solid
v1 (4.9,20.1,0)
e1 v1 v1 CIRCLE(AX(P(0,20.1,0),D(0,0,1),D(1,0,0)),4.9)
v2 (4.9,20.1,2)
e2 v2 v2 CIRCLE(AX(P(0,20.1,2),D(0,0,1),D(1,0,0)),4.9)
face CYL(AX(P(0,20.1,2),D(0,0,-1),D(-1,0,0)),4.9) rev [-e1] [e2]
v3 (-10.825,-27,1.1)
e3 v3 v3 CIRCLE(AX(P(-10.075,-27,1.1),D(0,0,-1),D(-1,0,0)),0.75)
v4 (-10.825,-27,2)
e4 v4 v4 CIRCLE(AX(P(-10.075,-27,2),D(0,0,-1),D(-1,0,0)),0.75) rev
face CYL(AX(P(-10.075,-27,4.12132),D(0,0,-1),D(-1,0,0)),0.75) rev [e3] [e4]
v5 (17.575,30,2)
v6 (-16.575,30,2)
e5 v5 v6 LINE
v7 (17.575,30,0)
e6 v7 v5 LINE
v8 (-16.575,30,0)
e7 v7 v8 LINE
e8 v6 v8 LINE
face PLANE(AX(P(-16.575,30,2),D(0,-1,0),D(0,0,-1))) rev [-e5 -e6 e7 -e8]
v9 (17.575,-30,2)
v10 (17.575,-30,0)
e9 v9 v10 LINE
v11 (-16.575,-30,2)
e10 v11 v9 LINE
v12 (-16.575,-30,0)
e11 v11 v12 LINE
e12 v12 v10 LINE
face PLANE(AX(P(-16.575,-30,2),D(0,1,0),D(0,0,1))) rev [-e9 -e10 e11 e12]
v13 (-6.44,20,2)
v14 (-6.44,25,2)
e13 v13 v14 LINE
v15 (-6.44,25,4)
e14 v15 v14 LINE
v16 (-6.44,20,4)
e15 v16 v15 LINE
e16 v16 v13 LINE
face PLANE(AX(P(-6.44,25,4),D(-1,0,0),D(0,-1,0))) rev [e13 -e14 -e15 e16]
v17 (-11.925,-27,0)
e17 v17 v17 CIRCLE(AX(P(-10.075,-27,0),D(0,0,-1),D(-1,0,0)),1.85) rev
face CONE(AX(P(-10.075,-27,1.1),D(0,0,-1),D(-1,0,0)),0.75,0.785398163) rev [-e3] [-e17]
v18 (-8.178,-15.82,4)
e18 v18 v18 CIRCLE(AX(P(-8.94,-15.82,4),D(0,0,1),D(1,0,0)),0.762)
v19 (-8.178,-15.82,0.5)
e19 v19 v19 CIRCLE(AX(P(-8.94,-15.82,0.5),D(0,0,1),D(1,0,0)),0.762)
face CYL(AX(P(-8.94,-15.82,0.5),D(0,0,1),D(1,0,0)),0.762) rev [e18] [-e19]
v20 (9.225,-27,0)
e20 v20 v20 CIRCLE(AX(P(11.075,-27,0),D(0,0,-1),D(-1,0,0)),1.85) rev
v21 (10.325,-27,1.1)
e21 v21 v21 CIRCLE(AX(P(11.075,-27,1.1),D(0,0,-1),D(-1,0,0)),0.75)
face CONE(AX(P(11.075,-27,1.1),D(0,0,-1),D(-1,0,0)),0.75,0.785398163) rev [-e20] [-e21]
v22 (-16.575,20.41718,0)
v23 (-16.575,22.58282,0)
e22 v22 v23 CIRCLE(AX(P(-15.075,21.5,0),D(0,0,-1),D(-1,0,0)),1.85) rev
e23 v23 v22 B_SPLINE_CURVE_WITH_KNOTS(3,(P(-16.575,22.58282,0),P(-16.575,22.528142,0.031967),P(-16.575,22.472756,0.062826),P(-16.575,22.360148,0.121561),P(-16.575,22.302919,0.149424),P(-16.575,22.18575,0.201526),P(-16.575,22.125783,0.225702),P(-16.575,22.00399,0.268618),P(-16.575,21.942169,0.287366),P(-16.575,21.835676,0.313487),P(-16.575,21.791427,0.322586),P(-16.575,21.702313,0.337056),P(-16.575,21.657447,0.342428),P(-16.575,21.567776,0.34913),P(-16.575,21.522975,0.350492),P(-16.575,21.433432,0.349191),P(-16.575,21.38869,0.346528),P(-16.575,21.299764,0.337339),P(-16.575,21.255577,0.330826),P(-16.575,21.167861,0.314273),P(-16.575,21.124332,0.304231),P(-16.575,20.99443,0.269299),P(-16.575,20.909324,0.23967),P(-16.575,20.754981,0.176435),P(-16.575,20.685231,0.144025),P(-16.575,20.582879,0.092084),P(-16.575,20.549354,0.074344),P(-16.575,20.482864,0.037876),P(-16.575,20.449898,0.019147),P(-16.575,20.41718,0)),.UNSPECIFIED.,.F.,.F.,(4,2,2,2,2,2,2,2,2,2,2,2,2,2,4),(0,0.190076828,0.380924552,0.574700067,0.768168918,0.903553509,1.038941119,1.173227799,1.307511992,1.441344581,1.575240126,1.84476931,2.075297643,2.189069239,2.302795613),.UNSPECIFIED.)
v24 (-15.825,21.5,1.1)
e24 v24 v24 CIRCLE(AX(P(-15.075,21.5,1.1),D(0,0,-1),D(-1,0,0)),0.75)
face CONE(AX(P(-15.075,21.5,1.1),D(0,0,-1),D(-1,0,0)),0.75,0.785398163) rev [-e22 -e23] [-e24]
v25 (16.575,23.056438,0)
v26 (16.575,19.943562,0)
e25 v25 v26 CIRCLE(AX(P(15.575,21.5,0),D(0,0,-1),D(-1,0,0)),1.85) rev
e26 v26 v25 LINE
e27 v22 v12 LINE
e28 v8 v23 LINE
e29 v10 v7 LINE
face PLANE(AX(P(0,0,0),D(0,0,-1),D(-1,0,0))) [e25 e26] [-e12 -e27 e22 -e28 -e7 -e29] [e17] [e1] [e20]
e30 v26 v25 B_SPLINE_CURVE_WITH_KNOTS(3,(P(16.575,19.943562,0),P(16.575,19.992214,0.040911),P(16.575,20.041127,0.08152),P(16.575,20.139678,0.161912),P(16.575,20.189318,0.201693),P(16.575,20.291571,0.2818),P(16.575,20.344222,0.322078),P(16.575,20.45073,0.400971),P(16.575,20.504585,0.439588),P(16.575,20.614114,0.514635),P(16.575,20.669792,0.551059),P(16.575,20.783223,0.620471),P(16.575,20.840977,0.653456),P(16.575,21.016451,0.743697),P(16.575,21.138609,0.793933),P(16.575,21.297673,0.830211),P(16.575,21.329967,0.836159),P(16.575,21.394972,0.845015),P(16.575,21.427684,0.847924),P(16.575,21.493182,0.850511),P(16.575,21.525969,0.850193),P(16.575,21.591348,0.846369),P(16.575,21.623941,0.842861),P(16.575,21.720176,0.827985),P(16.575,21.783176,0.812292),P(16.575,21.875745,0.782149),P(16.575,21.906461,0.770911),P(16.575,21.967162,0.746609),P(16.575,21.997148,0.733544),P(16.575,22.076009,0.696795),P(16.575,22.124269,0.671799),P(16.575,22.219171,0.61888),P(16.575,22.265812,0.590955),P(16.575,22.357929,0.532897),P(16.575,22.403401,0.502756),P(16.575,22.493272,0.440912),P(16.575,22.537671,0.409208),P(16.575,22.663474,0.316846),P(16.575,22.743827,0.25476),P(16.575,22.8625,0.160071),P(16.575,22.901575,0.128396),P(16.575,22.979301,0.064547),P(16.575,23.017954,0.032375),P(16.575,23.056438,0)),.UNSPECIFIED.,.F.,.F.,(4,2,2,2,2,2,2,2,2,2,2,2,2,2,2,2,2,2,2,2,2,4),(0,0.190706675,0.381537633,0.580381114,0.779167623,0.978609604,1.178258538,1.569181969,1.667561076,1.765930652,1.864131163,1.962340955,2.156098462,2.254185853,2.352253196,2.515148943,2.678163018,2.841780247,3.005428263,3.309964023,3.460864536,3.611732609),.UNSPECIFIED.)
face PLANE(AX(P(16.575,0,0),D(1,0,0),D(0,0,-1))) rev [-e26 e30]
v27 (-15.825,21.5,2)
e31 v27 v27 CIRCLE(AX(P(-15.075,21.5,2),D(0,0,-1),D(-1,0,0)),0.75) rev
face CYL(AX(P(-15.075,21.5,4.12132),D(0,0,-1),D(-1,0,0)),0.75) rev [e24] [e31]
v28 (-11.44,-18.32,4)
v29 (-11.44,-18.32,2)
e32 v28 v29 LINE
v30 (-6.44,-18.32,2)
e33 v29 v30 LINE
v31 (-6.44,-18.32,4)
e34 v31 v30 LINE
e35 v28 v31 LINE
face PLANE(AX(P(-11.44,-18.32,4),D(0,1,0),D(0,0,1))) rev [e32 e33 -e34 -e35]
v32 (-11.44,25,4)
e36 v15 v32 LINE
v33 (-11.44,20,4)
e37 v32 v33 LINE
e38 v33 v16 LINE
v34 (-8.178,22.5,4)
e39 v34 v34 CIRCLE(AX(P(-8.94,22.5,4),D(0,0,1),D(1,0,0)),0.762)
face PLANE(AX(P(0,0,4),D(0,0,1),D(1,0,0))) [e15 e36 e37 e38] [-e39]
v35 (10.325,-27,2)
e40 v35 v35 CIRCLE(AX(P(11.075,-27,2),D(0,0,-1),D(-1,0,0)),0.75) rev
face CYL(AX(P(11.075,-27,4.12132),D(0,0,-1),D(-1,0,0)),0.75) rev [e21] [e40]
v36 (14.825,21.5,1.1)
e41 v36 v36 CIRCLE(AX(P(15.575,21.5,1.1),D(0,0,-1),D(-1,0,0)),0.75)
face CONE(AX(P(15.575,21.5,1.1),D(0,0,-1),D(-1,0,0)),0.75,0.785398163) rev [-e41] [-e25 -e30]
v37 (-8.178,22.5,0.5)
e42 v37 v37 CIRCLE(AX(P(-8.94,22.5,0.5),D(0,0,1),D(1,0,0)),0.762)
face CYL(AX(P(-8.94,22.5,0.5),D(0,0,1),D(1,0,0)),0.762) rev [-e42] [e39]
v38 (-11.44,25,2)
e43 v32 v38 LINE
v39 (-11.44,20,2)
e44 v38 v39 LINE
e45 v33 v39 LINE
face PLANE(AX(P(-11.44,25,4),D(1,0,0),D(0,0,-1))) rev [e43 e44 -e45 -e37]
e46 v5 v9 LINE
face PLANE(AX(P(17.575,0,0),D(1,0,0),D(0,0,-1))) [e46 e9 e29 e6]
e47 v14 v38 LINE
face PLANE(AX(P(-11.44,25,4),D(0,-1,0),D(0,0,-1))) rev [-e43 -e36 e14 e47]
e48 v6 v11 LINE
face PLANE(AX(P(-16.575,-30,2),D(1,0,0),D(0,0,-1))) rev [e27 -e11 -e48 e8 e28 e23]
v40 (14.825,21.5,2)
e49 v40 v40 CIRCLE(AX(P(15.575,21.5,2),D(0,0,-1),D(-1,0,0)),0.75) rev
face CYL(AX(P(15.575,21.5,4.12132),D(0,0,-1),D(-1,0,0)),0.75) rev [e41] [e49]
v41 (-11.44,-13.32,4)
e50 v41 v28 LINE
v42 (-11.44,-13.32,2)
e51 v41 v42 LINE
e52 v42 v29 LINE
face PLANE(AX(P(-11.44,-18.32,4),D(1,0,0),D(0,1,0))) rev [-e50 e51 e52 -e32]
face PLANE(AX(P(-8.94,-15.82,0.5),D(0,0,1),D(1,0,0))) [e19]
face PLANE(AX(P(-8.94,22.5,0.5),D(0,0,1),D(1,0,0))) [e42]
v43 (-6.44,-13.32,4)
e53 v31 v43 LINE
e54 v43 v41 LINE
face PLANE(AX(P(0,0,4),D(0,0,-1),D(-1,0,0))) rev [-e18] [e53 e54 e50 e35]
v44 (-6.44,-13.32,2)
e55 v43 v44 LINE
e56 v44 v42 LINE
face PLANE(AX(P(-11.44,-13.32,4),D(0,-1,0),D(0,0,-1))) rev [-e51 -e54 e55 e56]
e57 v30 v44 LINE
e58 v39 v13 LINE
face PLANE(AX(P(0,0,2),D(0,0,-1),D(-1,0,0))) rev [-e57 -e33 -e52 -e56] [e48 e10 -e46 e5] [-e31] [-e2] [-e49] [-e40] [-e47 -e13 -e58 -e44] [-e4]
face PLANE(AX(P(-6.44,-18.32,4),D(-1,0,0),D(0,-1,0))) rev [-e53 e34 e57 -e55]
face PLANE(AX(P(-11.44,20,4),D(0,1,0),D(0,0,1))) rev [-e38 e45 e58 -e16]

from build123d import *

# Parameters (mm, degrees)
SKETCH1_W           = 33.15
SKETCH1_H           = 60
SKETCH1_R           = 4.9
BOSS_EXTRUDE1_DEPTH = 2
SKETCH3_W           = 5
SKETCH3_H           = 5
BOSS_EXTRUDE2_DEPTH = 2
SKETCH4_R           = 0.75
CUT_EXTRUDE1_DEPTH  = 2
CHAMFER1_SIZE       = 1.1
SKETCH5_W           = 2
SKETCH5_H           = 60
BOSS_EXTRUDE3_DEPTH = 1
SKETCH7_R           = 0.762
CUT_EXTRUDE2_DEPTH  = 3.5


with BuildPart() as part:
    # Sketch1 → Boss-Extrude1 (new body)
    with BuildSketch(Plane.XY):
        Rectangle(SKETCH1_W, SKETCH1_H)
        with Locations((0, 20.1)):
            Circle(SKETCH1_R, mode=Mode.SUBTRACT)
    extrude(amount=BOSS_EXTRUDE1_DEPTH)

    # Sketch3 → Boss-Extrude2 (add)
    with BuildSketch(Plane.XY.offset(2)):
        with Locations((-8.94, 22.5)):
            Rectangle(SKETCH3_W, SKETCH3_H)
        with Locations((-8.94, -15.82)):
            Rectangle(SKETCH3_W, SKETCH3_H)
    extrude(amount=BOSS_EXTRUDE2_DEPTH)

    # Sketch4 → Cut-Extrude1 (cut)
    with BuildSketch(Plane(origin=(0, 0, 0), x_dir=(-1, 0, 0), z_dir=(0, 0, -1))):
        with Locations((-15.575, 21.5)):
            Circle(SKETCH4_R)
        with Locations((15.075, 21.5)):
            Circle(SKETCH4_R)
        with Locations((10.075, -27)):
            Circle(SKETCH4_R)
        with Locations((-11.075, -27)):
            Circle(SKETCH4_R)
    extrude(amount=-CUT_EXTRUDE1_DEPTH, mode=Mode.SUBTRACT)

    # Chamfer1
    # the kernel refuses this chamfer: 1.1 mm, written as the material it takes off along each edge
    with BuildSketch(Plane(origin=(15.575, 21.5, 0), x_dir=(-1, 0, 0), z_dir=(0, -1, 0))) as chamfer1_piece_1:
        Polygon((0.75 + CHAMFER1_SIZE, 0), (0.75, -CHAMFER1_SIZE), (0.75, 0), align=None)
    revolve(axis=Axis((15.575, 21.5, 0), (0, 0, -1)), mode=Mode.SUBTRACT)
    with BuildSketch(Plane(origin=(-15.075, 21.5, 0), x_dir=(-1, 0, 0), z_dir=(0, -1, 0))) as chamfer1_piece_2:
        Polygon((0.75 + CHAMFER1_SIZE, 0), (0.75, -CHAMFER1_SIZE), (0.75, 0), align=None)
    revolve(axis=Axis((-15.075, 21.5, 0), (0, 0, -1)), mode=Mode.SUBTRACT)
    with BuildSketch(Plane(origin=(-10.075, -27, 0), x_dir=(-1, 0, 0), z_dir=(0, -1, 0))) as chamfer1_piece_3:
        Polygon((0.75 + CHAMFER1_SIZE, 0), (0.75, -CHAMFER1_SIZE), (0.75, 0), align=None)
    revolve(axis=Axis((-10.075, -27, 0), (0, 0, -1)), mode=Mode.SUBTRACT)
    with BuildSketch(Plane(origin=(11.075, -27, 0), x_dir=(-1, 0, 0), z_dir=(0, -1, 0))) as chamfer1_piece_4:
        Polygon((0.75 + CHAMFER1_SIZE, 0), (0.75, -CHAMFER1_SIZE), (0.75, 0), align=None)
    revolve(axis=Axis((11.075, -27, 0), (0, 0, -1)), mode=Mode.SUBTRACT)

    # Sketch5 → Boss-Extrude3 (add)
    with BuildSketch(Plane(origin=(16.575, 0, 0), x_dir=(0, 0, -1), z_dir=(1, 0, 0))):
        with Locations((-1, 0)):
            Rectangle(SKETCH5_W, SKETCH5_H)
    extrude(amount=BOSS_EXTRUDE3_DEPTH)

    # Sketch7 → Cut-Extrude2 (cut)
    with BuildSketch(Plane.XY.offset(4)):
        with Locations((-8.94, 22.5)):
            Circle(SKETCH7_R)
        with Locations((-8.94, -15.82)):
            Circle(SKETCH7_R)
    extrude(amount=-CUT_EXTRUDE2_DEPTH, mode=Mode.SUBTRACT)


solid = part.part
